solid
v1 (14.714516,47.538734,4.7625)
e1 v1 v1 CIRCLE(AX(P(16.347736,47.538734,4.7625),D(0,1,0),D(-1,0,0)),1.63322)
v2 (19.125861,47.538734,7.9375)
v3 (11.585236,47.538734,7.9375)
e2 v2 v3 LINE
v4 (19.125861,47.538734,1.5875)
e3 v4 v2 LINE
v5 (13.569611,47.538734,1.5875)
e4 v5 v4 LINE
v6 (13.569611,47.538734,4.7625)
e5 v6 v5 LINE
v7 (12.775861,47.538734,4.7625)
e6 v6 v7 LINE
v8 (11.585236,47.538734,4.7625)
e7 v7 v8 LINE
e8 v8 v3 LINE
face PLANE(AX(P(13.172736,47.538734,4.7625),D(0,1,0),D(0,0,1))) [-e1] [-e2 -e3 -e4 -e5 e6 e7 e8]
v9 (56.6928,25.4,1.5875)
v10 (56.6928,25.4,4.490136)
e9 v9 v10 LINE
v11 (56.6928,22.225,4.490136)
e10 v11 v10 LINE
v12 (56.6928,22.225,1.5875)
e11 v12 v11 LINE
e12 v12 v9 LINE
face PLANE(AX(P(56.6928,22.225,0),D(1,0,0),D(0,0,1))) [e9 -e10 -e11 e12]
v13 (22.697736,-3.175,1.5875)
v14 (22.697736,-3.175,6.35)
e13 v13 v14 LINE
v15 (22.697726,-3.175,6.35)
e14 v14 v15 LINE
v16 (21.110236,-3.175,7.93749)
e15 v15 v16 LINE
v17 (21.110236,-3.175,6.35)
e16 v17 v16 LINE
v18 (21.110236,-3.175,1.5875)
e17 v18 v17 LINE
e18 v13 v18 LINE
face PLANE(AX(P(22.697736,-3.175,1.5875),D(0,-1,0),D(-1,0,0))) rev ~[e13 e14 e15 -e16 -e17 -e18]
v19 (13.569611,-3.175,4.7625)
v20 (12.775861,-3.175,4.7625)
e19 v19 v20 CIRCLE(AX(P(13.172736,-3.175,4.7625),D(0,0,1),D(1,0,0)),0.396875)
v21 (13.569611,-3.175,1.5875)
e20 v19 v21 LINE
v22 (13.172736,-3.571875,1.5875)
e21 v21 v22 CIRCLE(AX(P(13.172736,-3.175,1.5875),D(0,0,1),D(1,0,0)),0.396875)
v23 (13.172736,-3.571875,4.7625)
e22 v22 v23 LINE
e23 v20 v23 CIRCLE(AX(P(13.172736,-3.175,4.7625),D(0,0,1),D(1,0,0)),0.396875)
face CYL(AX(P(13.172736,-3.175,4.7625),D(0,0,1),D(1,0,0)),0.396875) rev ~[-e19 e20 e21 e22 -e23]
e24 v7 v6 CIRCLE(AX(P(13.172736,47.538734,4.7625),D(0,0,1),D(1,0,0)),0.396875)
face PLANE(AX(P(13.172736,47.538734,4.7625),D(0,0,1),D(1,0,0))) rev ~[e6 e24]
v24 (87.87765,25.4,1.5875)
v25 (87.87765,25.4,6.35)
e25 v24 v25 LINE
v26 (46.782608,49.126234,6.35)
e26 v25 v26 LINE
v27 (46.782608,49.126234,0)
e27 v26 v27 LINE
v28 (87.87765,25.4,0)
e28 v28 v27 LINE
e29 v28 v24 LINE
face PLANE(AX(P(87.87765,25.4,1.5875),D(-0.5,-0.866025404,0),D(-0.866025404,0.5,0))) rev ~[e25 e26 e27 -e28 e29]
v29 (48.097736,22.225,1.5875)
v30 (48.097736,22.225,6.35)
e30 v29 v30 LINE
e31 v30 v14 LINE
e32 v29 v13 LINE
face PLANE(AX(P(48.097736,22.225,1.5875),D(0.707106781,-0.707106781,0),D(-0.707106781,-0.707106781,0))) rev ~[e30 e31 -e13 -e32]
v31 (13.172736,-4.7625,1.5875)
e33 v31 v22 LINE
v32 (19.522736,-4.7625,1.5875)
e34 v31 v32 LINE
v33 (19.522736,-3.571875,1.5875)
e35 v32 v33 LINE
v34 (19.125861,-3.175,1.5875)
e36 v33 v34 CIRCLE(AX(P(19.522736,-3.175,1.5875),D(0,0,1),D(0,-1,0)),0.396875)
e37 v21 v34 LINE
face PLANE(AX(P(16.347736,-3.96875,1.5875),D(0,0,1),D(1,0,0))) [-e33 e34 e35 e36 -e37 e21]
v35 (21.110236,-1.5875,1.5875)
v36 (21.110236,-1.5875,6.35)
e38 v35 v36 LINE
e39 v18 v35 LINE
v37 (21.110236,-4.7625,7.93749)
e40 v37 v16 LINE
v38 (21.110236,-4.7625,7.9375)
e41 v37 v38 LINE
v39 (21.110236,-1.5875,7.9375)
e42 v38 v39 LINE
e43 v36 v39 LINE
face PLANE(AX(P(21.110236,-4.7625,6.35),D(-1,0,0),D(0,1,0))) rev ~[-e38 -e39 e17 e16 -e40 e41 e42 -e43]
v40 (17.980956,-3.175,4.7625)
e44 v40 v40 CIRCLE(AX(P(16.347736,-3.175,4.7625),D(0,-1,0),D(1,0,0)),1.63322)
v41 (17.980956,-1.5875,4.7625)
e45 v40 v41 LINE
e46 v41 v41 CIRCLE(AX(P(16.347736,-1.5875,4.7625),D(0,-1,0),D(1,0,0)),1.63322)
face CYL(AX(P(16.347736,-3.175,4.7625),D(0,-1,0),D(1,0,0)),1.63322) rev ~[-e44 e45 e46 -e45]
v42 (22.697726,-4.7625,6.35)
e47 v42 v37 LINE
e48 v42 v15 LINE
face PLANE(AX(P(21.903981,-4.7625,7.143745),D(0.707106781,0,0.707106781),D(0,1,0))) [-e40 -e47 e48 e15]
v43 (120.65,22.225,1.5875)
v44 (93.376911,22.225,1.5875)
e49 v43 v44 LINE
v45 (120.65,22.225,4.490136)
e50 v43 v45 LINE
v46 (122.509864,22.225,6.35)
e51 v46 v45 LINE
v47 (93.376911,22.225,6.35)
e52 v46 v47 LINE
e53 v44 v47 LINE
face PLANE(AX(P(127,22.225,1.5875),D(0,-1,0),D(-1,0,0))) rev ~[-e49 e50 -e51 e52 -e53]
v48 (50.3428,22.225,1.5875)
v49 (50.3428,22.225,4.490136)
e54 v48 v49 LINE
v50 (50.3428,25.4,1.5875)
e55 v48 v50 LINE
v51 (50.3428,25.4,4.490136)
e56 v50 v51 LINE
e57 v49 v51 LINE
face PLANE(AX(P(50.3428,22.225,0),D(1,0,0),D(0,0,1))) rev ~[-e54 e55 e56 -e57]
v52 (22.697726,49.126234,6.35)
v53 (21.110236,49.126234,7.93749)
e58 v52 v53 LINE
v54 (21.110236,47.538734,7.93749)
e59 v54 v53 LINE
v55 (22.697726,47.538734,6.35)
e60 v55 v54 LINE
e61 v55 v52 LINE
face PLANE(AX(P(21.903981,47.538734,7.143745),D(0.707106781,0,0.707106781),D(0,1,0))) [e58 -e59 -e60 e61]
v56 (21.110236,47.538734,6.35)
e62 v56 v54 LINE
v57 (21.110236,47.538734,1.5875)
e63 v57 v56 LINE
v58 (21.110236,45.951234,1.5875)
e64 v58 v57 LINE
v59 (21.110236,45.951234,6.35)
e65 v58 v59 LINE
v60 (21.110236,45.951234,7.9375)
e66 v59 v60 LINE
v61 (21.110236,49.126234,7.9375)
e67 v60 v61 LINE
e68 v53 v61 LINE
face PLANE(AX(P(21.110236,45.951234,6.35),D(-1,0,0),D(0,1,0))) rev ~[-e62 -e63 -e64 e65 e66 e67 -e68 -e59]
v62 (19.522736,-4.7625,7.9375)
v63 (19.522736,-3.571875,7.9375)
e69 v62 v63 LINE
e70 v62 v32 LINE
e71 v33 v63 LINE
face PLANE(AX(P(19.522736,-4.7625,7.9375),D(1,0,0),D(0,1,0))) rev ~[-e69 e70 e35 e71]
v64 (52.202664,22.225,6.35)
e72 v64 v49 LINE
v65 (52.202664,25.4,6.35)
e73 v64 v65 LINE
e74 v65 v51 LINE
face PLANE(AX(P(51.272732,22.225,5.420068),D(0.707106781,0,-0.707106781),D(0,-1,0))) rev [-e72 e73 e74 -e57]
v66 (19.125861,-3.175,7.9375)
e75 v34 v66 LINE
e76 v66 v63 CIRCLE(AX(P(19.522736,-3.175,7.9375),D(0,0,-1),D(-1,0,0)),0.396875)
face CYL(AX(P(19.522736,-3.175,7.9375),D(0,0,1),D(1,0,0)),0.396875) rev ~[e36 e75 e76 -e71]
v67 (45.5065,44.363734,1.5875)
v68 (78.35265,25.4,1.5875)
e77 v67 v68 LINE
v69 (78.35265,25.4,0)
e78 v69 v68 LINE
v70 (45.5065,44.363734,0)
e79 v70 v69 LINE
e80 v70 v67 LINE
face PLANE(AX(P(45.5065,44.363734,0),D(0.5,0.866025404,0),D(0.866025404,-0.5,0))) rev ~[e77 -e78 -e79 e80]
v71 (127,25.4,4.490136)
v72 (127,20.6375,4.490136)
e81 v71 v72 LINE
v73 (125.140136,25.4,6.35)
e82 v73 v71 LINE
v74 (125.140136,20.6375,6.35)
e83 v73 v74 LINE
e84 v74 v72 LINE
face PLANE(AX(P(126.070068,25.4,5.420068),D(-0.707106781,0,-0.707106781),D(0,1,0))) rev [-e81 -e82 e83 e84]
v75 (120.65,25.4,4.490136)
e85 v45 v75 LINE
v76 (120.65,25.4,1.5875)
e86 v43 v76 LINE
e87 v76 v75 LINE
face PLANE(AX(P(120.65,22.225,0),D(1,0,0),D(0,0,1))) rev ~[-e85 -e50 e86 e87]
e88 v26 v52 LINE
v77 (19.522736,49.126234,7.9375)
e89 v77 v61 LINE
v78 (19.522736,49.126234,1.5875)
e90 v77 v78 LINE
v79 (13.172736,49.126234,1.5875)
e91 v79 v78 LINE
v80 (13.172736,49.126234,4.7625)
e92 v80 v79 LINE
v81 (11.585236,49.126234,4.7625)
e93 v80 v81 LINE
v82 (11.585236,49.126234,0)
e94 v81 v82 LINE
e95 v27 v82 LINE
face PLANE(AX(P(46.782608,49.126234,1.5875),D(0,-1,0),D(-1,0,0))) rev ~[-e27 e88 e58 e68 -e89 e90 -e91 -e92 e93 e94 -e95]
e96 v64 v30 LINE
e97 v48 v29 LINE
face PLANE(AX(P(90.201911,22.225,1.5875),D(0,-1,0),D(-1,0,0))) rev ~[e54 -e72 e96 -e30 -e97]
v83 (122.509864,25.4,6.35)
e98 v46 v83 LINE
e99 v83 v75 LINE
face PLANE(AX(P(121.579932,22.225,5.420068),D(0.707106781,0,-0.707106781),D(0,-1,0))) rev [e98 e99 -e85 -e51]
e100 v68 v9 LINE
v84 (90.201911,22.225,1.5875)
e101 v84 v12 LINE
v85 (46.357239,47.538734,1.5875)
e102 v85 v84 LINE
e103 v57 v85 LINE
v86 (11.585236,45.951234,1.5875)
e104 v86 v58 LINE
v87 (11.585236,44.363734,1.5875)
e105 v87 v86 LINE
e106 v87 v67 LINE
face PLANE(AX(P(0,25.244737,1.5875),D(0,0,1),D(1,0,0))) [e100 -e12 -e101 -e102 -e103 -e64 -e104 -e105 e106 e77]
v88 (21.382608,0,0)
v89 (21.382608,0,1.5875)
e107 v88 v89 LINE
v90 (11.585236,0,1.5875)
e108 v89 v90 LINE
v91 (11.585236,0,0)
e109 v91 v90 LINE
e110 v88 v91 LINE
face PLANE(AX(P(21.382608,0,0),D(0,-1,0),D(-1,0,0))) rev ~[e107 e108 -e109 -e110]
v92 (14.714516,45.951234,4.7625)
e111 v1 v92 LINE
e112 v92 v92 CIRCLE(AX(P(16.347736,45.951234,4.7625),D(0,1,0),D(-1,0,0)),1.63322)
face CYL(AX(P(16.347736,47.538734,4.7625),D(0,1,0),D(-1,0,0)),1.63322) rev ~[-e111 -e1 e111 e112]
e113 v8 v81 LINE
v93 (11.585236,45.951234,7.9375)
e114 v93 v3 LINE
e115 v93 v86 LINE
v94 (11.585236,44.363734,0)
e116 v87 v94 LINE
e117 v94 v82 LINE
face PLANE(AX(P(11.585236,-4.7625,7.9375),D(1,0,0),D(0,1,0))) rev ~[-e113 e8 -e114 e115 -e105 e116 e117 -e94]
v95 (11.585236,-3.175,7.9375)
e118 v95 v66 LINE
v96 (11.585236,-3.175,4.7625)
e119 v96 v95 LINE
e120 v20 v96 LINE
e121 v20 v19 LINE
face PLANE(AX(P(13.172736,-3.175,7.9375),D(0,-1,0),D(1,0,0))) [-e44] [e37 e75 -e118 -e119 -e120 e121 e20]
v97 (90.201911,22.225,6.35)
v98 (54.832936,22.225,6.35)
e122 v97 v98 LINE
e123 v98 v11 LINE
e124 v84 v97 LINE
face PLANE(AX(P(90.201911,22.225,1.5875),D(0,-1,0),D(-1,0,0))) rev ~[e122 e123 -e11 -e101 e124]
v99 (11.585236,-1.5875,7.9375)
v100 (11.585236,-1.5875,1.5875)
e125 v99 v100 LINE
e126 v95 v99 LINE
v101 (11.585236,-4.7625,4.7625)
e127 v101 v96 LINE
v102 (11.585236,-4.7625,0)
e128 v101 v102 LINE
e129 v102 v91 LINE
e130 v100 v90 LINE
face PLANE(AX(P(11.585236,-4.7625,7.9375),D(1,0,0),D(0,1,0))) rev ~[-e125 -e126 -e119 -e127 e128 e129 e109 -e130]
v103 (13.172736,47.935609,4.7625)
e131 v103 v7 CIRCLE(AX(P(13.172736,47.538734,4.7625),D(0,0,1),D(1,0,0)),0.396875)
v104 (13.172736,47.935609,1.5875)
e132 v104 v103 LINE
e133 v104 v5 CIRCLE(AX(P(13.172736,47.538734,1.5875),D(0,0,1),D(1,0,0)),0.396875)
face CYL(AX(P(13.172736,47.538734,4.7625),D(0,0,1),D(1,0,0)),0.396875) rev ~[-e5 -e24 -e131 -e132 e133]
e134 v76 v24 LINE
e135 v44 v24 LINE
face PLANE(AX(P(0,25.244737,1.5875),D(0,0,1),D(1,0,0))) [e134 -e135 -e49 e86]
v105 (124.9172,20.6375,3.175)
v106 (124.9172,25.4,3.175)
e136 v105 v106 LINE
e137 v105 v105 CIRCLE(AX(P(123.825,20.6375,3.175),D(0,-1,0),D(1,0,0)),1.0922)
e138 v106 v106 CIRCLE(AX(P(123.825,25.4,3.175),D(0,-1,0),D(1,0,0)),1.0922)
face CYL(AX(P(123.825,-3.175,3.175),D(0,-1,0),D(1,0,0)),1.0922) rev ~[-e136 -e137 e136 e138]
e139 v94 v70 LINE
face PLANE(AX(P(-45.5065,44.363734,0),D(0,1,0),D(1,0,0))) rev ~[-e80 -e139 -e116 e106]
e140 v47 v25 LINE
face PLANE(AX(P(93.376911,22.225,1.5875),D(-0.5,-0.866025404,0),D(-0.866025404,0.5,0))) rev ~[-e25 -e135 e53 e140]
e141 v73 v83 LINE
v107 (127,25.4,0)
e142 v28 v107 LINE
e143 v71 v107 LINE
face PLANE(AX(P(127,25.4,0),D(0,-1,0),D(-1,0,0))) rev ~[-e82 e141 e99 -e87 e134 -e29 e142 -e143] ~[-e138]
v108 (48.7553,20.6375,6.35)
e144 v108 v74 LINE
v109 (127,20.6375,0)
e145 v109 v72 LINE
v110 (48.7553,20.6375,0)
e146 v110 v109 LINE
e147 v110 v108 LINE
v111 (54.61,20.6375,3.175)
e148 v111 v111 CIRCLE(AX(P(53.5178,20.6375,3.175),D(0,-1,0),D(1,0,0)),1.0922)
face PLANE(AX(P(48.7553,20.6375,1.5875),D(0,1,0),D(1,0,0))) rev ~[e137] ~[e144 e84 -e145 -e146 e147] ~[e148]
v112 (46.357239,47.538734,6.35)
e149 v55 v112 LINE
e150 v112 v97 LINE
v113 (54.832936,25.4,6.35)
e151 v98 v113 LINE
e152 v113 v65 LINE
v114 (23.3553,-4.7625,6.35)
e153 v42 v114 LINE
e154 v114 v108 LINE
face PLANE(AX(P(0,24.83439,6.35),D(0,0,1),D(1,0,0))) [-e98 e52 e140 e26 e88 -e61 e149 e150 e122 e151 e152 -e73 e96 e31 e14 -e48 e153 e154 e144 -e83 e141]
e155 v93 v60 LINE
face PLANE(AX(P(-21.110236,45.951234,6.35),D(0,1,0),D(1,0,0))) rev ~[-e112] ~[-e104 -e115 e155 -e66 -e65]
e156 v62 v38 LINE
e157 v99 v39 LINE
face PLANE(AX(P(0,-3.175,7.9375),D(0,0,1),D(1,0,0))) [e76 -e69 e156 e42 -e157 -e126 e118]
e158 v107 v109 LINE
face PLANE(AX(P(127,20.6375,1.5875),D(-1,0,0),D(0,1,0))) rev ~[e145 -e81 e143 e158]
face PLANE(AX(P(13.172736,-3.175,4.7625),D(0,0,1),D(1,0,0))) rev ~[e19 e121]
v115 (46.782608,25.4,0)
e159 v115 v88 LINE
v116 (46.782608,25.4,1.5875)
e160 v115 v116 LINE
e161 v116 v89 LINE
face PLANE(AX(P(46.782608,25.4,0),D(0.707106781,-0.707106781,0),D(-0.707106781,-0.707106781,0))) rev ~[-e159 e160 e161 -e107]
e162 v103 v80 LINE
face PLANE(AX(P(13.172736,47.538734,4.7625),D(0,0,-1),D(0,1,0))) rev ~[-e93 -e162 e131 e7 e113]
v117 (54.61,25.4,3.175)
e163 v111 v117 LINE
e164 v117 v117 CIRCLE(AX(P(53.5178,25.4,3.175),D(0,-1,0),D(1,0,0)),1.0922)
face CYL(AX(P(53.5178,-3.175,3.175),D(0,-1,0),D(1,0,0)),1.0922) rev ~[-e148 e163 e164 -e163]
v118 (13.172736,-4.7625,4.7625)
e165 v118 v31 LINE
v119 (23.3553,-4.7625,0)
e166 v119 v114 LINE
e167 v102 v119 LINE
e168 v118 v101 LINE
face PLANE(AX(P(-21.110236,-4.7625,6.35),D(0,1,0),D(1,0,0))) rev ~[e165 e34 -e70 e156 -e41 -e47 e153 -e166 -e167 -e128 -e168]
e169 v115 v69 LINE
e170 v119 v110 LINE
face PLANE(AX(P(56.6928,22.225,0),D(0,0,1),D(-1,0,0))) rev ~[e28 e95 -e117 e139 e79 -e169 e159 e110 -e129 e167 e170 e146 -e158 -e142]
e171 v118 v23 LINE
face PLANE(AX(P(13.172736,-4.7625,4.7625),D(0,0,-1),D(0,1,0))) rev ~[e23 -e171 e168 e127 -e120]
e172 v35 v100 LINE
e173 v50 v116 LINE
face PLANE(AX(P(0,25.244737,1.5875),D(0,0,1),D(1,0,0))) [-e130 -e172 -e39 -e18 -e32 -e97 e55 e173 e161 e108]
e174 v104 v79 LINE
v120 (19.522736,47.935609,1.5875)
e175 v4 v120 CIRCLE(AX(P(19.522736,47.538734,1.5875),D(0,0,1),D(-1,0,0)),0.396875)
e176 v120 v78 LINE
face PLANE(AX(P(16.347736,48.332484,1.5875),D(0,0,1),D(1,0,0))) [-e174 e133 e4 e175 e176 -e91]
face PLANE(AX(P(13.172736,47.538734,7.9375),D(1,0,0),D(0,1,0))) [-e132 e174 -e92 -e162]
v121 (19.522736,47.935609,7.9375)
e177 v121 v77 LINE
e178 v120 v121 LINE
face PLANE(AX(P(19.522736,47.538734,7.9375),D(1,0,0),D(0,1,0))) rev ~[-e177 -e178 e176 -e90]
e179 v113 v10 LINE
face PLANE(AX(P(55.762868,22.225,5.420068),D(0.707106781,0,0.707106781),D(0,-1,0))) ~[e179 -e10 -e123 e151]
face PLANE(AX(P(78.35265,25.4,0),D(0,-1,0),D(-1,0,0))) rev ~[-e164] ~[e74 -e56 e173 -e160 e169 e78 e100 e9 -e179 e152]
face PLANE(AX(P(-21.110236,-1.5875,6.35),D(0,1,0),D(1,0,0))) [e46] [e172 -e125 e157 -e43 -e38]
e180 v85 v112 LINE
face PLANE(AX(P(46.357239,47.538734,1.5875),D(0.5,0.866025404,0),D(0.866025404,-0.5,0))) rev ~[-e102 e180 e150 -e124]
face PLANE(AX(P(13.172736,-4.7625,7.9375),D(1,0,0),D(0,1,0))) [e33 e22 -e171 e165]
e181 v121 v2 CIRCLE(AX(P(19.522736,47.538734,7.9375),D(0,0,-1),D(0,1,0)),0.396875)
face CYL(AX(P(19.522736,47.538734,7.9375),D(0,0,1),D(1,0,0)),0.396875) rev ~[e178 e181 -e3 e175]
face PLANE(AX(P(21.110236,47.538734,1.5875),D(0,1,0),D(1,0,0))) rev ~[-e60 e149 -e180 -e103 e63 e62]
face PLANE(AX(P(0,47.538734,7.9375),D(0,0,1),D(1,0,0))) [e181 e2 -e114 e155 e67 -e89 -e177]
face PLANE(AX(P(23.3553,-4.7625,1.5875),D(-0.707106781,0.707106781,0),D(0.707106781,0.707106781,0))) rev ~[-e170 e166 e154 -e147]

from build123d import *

# Parameters (mm, degrees)
F1_DEPTH  = 1.5875
F3_DEPTH  = 4.7625
F4_W      = 6.35
F4_H      = 6.35
F5_DEPTH  = 3.175
F6_SIZE   = 1.8598642
F7_W      = 42.2204719395
F7_H      = 3.175
F8_DEPTH  = 1.5875
F9_W      = 6.35
F9_H      = 1.5875
F10_DEPTH = 6.35
F11_R     = 1.0922
F11_R_2   = 1.63322
F12_DEPTH = 28.575
F13_SIZE  = 1.58749
F14_R     = 0.396875
F15_DEPTH = 6.35
F16_R     = 1.63322
F17_DEPTH = 1.5875
F18_W     = 138.5852359697
F18_H     = 53.8887336135
F19_DEPTH = 7.9375
F20_W     = 1.5875
F20_H     = 3.175
F21_DEPTH = 1.5875
F22_R     = 0.396875
F23_DEPTH = 3.175


# Not quite as in the source:
# - a fillet or chamfer is up to 0.001 mm smaller than in the source, because OpenCascade refuses the exact size


with BuildPart() as f1:
    # F0 (on Top) → F1 (new body)
    with BuildSketch(Plane.XY):
        Polygon((-87.87765, 25.4), (-127, 25.4), (-127, 20.6375), (-48.7553, 20.6375), (-23.3553, -4.7625), (23.3553, -4.7625), (48.7553, 20.6375), (127, 20.6375), (127, 25.4), (87.87765, 25.4), (46.7826079092, 49.1262336135), (-46.7826079092, 49.1262336135), align=None)
        Polygon((-21.3826079092, 0), (-46.7826079092, 25.4), (-78.35265, 25.4), (-45.5064998802, 44.3637336135), (45.5064998802, 44.3637336135), (78.35265, 25.4), (46.7826079092, 25.4), (21.3826079092, 0), align=None, mode=Mode.SUBTRACT)
    extrude(amount=F1_DEPTH)

    # F2 (on face) → F3 (join)
    with BuildSketch(Plane.XY.offset(1.5875)):
        Polygon((-127, 22.225), (-127, 20.6375), (-48.7553, 20.6375), (-23.3553, -4.7625), (23.3553, -4.7625), (48.7553, 20.6375), (127, 20.6375), (127, 22.225), (93.376911314, 22.225), (87.87765, 25.4), (46.7826079092, 49.1262336135), (-46.7826079092, 49.1262336135), (-87.87765, 25.4), (-93.376911314, 22.225), align=None)
        Polygon((90.201911314, 22.225), (48.0977359697, 22.225), (22.6977359697, -3.175), (21.1102359697, -3.175), (21.1102359697, -1.5875), (-21.1102359697, -1.5875), (-21.1102359697, -3.175), (-22.6977359697, -3.175), (-48.0977359697, 22.225), (-90.201911314, 22.225), (-46.3572385662, 47.5387336135), (-21.1102359697, 47.5387336135), (-21.1102359697, 45.9512336135), (21.1102359697, 45.9512336135), (21.1102359697, 47.5387336135), (46.3572385662, 47.5387336135), align=None, mode=Mode.SUBTRACT)
    extrude(amount=F3_DEPTH)

    # F4 (on face) → F5 (join, through all)
    with BuildSketch(Plane(origin=(0, 22.225, 0), x_dir=(-1, 0, 0), z_dir=(0, 1, 0))):
        with Locations((-53.5178, 3.175)):
            Rectangle(F4_W, F4_H)
        with Locations((-123.825, 3.175)):
            Rectangle(F4_W, F4_H)
        with Locations((123.825, 3.175)):
            Rectangle(F4_W, F4_H)
        with Locations((53.5178, 3.175)):
            Rectangle(F4_W, F4_H)
    extrude(amount=F5_DEPTH)

    # F6
    f6_edges = [f1.edges().sort_by_distance(p)[0] for p in [
        (-127, 23.01875, 6.35),
        (-120.65, 23.8125, 6.35),
        (-56.6928, 23.8125, 6.35),
        (-50.3428, 23.8125, 6.35),
        (50.3428, 23.8125, 6.35),
        (56.6928, 23.8125, 6.35),
        (120.65, 23.8125, 6.35),
        (127, 23.01875, 6.35),
    ]]
    chamfer(f6_edges, length=F6_SIZE)

    # F7 (on face) → F8 (join)
    with BuildSketch(Plane.XY.offset(6.35)):
        with Locations((0, -3.175)):
            Rectangle(F7_W, F7_H)
        with Locations((0, 47.5387336135)):
            Rectangle(F7_W, F7_H)
    extrude(amount=F8_DEPTH)

    # F9 (on face) → F10 (cut, through all)
    with BuildSketch(Plane.XY.offset(7.9375)):
        with Locations((16.3477359697, -3.96875)):
            Rectangle(F9_W, F9_H)
        with Locations((16.3477359697, 48.3324836135)):
            Rectangle(F9_W, F9_H)
    extrude(amount=-F10_DEPTH, mode=Mode.SUBTRACT)

    # F11 (on face) → F12 (cut, through all)
    with BuildSketch(Plane.XZ.offset(3.175)):
        with Locations((53.5178, 3.175)):
            Circle(F11_R)
        with Locations((123.825, 3.175)):
            Circle(F11_R)
        with Locations((-123.825, 3.175)):
            Circle(F11_R)
        with Locations((-53.5178, 3.175)):
            Circle(F11_R)
        with Locations((16.3477359697, 4.7625)):
            Circle(F11_R_2)
    extrude(amount=-F12_DEPTH, mode=Mode.SUBTRACT)

    # F13 (size 1.5875 in the source; OpenCascade refuses exactly that, so slightly less here)
    f13_edges = [f1.edges().sort_by_distance(p)[0] for p in [
        (-21.110236, -3.96875, 6.35),
        (21.110236, -3.96875, 6.35),
        (-21.110236, 48.332484, 6.35),
        (21.110236, 48.332484, 6.35),
    ]]
    chamfer(f13_edges, length=F13_SIZE)

    # F14 (on face) → F15 (cut, through all)
    with BuildSketch(Plane.XY.offset(7.9375)):
        with Locations((19.5227359697, -3.175)):
            Circle(F14_R)
        with Locations((19.5227359697, 47.5387336135)):
            Circle(F14_R)
    extrude(amount=-F15_DEPTH, mode=Mode.SUBTRACT)

    # F16 (on face) → F17 (cut, through all)
    with BuildSketch(Plane(origin=(0, 47.5387336135, 0), x_dir=(-1, 0, 0), z_dir=(0, 1, 0))):
        with Locations((-16.3477359697, 4.7625)):
            Circle(F16_R)
    extrude(amount=-F17_DEPTH, mode=Mode.SUBTRACT)

    # F18 (on face) → F19 (cut, through all)
    with BuildSketch(Plane.XY.offset(7.9375)):
        with Locations((-57.7073820151, 22.1818668067)):
            Rectangle(F18_W, F18_H)
    extrude(amount=-F19_DEPTH, mode=Mode.SUBTRACT)

    # F20 (on face) → F21 (cut, through all)
    with BuildSketch(Plane.YZ.offset(13.1727359697)):
        with Locations((48.3324836135, 6.35)):
            Rectangle(F20_W, F20_H)
        with Locations((-3.96875, 6.35)):
            Rectangle(F20_W, F20_H)
    extrude(amount=-F21_DEPTH, mode=Mode.SUBTRACT)

    # F22 (on face) → F23 (cut, through all)
    with BuildSketch(Plane.XY.offset(4.7625)):
        with Locations((13.1727359697, -3.175)):
            Circle(F22_R)
        with Locations((13.1727359697, 47.5387336135)):
            Circle(F22_R)
    extrude(amount=-F23_DEPTH, mode=Mode.SUBTRACT)


solid = f1.part
